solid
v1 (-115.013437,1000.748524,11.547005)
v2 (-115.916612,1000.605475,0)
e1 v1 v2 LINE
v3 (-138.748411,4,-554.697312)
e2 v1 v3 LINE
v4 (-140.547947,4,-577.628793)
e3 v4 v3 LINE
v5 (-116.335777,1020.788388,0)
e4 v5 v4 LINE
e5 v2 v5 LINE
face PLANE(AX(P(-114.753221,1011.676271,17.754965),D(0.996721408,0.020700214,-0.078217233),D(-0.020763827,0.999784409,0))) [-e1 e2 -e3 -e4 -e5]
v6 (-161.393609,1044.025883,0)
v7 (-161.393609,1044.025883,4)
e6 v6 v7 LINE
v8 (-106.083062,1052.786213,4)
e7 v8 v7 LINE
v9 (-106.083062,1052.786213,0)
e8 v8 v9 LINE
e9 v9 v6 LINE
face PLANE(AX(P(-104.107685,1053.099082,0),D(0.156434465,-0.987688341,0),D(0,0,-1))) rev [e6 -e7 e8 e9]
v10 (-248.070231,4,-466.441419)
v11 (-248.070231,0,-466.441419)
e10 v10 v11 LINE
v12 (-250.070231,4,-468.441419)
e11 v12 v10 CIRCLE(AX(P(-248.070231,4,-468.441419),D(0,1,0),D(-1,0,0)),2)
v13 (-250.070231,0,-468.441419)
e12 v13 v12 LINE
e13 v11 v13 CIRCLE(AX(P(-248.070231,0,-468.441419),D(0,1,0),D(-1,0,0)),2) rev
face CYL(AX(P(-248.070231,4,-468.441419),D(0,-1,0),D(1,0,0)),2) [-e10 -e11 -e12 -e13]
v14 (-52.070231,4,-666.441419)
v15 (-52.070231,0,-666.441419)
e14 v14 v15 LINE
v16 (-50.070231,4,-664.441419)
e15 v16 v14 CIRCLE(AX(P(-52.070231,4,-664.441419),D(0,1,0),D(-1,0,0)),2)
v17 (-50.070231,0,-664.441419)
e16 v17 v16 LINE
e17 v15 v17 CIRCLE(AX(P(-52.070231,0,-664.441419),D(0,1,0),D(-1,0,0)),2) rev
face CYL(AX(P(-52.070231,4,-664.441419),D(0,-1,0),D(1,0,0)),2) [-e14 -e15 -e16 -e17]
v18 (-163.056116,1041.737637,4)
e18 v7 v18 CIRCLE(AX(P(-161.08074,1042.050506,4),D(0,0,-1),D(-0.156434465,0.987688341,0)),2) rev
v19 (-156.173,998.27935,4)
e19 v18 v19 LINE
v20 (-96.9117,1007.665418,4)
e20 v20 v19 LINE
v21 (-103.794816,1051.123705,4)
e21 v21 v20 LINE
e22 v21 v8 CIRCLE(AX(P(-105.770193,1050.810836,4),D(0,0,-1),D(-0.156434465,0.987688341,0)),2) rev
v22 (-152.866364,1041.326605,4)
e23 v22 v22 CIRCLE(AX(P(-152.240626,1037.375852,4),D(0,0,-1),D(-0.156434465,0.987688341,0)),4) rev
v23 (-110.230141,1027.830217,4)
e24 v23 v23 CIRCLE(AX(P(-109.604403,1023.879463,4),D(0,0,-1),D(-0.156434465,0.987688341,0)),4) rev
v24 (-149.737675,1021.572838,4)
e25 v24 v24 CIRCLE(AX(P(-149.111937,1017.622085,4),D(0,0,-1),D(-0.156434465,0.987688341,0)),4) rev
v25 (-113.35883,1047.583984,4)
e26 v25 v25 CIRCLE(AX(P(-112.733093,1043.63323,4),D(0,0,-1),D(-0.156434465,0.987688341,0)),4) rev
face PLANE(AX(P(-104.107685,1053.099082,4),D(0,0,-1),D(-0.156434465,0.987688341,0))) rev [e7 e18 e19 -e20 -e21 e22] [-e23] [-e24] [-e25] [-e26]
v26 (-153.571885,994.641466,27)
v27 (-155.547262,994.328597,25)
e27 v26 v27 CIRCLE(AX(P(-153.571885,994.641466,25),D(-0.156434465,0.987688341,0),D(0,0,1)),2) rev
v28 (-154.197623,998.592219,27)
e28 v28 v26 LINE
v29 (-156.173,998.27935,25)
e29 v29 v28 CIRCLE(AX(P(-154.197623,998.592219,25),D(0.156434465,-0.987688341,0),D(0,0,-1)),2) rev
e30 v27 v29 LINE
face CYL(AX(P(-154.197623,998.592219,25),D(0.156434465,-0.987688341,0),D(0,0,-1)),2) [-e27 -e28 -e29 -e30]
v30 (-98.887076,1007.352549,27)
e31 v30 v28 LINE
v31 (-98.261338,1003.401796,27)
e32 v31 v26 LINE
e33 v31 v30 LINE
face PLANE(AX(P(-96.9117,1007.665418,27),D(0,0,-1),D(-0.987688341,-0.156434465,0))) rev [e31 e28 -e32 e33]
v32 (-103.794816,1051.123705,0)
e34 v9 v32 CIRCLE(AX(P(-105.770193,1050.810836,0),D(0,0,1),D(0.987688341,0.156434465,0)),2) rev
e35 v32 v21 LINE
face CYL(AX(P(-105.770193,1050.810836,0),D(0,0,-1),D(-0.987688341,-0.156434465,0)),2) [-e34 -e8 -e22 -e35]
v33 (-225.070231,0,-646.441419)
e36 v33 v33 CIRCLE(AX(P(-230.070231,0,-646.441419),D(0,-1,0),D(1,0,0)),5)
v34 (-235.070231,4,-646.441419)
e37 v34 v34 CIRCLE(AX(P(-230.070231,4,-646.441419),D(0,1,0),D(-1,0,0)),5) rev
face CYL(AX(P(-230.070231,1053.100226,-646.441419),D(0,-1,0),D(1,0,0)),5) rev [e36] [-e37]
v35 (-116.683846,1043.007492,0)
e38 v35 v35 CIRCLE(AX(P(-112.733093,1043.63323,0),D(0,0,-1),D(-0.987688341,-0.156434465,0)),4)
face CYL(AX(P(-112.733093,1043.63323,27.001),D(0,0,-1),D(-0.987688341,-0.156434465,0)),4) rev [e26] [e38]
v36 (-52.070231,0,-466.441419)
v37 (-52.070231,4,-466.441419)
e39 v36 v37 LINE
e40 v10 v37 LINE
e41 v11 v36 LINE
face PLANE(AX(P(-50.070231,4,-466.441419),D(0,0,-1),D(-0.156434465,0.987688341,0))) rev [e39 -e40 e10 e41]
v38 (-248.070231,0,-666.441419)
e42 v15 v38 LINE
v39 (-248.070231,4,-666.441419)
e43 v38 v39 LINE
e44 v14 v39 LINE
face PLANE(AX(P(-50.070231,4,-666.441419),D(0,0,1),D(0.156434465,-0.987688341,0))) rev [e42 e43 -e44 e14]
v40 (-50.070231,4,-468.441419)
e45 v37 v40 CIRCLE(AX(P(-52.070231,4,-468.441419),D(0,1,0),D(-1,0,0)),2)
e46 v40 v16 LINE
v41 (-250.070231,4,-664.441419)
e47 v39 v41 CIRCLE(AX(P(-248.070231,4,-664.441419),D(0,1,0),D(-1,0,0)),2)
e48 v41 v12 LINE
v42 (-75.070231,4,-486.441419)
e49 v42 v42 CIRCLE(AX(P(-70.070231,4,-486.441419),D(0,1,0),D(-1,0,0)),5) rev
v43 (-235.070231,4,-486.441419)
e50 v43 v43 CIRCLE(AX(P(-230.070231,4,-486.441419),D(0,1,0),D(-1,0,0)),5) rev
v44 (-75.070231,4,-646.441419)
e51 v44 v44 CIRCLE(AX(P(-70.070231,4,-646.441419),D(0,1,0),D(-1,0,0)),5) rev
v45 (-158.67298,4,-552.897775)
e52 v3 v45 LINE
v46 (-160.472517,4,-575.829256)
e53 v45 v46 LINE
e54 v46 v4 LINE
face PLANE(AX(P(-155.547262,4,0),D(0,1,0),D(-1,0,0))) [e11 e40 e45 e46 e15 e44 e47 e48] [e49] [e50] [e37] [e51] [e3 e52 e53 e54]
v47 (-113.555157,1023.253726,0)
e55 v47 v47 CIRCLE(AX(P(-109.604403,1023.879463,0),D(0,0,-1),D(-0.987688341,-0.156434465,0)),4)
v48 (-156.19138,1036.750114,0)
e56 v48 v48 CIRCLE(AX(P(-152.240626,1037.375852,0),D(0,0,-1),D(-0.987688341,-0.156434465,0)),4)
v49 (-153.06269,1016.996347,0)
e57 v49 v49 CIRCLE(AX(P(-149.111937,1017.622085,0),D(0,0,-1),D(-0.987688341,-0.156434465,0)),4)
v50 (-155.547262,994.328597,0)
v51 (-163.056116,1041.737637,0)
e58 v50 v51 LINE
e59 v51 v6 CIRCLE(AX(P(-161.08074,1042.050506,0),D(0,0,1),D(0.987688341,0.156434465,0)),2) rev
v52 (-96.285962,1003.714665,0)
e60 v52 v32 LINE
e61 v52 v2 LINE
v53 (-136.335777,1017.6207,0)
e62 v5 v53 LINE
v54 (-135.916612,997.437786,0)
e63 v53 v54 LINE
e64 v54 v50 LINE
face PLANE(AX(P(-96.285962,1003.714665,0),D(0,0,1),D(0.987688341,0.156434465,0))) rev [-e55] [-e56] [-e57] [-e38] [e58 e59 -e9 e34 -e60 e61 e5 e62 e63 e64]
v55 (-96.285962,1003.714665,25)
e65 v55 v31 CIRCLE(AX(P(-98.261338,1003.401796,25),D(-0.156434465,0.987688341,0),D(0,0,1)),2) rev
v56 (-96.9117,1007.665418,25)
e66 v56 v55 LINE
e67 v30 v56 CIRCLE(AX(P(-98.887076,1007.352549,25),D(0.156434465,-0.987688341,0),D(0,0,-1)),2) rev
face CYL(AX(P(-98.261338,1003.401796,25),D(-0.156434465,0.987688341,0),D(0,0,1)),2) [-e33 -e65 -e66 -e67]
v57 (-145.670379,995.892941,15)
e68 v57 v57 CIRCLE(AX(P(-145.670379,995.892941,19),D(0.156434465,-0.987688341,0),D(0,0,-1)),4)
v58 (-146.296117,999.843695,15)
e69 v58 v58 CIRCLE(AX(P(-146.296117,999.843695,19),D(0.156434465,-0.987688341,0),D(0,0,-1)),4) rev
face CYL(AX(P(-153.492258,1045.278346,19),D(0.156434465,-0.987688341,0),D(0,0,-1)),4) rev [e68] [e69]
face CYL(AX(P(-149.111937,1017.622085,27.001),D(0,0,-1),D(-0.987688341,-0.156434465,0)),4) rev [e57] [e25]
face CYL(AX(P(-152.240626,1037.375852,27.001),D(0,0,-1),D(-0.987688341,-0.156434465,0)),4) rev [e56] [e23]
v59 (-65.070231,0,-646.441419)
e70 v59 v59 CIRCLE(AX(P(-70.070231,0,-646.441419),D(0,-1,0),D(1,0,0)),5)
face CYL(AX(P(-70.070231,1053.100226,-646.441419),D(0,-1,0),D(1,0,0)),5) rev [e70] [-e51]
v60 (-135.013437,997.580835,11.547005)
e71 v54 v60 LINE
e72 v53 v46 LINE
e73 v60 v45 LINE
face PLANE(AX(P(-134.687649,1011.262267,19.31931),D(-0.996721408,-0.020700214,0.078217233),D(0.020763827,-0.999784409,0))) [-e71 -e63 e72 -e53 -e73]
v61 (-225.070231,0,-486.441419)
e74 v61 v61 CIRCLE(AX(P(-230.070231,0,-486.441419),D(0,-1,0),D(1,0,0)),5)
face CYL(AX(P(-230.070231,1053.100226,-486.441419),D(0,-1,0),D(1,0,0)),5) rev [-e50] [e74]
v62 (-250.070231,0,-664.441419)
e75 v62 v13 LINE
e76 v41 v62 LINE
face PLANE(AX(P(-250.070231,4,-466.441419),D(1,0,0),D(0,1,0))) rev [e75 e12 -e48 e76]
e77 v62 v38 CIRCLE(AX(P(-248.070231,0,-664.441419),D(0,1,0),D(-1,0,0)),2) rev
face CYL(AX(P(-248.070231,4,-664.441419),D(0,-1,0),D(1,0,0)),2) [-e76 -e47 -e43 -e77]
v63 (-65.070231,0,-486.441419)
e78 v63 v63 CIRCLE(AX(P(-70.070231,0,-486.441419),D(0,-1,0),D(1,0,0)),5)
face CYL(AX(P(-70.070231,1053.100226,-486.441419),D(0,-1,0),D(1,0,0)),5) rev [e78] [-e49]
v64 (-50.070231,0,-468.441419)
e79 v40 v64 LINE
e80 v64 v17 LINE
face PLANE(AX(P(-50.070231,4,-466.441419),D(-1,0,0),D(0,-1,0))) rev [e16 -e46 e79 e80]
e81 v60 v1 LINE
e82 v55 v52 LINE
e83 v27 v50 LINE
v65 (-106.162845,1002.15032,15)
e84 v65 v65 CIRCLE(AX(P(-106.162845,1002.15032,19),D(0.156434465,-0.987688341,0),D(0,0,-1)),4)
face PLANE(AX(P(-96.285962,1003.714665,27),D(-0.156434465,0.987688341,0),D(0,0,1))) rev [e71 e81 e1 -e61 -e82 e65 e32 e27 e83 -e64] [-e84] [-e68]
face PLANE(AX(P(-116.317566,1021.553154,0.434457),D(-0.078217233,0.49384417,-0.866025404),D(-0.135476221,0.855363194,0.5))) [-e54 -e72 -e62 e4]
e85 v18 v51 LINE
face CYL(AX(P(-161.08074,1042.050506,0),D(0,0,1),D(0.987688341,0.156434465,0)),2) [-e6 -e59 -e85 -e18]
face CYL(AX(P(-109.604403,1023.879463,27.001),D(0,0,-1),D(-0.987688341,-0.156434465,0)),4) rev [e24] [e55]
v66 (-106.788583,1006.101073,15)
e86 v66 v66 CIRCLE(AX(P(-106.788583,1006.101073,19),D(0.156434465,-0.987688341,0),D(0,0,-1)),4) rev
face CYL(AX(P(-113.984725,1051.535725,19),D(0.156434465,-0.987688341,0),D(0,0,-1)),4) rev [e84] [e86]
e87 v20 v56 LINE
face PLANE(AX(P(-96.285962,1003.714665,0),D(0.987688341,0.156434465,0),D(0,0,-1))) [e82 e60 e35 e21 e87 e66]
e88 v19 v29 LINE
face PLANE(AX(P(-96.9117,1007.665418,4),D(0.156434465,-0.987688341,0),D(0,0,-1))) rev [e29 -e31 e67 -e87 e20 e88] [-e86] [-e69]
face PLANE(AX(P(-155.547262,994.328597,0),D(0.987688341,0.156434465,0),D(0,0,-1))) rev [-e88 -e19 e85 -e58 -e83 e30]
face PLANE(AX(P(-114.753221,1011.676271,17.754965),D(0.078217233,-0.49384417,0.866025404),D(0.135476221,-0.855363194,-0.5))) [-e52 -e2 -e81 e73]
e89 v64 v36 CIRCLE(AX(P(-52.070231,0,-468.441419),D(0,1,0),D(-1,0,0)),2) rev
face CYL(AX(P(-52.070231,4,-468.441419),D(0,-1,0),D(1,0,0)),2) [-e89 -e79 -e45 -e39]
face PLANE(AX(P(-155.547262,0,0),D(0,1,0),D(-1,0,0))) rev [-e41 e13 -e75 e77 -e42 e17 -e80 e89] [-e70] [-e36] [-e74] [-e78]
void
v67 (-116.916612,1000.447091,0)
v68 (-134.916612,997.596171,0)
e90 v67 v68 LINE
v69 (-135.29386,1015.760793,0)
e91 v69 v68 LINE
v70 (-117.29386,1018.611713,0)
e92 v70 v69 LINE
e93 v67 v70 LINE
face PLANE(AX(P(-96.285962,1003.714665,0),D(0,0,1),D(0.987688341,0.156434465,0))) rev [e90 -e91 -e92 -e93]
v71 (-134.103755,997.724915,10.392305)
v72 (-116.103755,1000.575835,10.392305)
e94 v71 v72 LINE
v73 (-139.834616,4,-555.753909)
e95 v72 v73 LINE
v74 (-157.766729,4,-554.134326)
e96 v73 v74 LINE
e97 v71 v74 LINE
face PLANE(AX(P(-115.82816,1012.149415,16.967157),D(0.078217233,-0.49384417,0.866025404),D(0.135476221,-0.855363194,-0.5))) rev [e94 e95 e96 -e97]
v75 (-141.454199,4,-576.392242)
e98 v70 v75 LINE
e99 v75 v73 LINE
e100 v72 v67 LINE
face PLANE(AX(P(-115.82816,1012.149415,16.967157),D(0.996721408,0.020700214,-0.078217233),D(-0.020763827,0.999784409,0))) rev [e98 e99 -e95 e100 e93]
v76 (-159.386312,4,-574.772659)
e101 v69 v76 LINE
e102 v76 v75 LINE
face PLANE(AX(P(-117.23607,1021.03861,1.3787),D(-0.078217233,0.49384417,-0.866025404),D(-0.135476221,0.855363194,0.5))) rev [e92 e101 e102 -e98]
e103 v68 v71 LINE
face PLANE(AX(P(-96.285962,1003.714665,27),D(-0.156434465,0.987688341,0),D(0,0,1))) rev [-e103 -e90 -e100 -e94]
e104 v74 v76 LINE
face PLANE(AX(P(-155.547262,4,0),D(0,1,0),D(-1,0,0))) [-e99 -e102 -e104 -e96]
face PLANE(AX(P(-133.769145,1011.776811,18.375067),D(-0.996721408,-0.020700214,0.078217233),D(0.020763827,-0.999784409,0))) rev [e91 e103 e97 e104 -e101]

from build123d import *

# Parameters (mm, degrees)
BOSS_EXTRUDE1_DEPTH      = 60
BOSS_EXTRUDE2_DEPTH      = 2000
BOSS_EXTRUDE2_DEPTH_BACK = 20
SKETCH3_W                = 20
SKETCH3_H                = 20
SKETCH3_W_2              = 18
SKETCH3_H_2              = 18
CUT_EXTRUDE1_DEPTH       = 60
SKETCH7_W                = 200
SKETCH7_H                = 200
BOSS_EXTRUDE3_DEPTH      = 4
SKETCH8_W                = 109.20231627
SKETCH8_H                = 482.966945154
CUT_EXTRUDE3_DEPTH       = 1000
CUT_EXTRUDE4_REACH       = 1228.081
SKETCH9_R                = 3.999999996
CUT_EXTRUDE5_REACH       = 1228.081
SKETCH10_R               = 4.000000003
CUT_EXTRUDE6_REACH       = 1249.32
SKETCH11_R               = 5
FILLET1_R                = 2
FILLET2_R                = 2
BODY_MOVE_COPY1_ANGLE    = 9


with BuildPart() as part:
    # Sketch1 → Boss-Extrude1 (new body)
    with BuildSketch(Plane(origin=(0, 0, 0), x_dir=(0, 0, -1), z_dir=(1, 0, 0))):
        Polygon((0, 0), (0, 50), (-4, 50), (-4, 4), (-27, 4), (-27, 0), align=None)
    extrude(amount=BOSS_EXTRUDE1_DEPTH)

    # Sketch3 → Boss-Extrude2 (add, two sides: drawn at the far end of the back side and taken through both)
    with BuildSketch(Plane(origin=(0.734152256, 4.01424851, 2.317627458), x_dir=(0, -0.49999999999998884, 0.866025403784445), z_dir=(-0.1564344650402179, -0.8553631939770945, -0.4938441702975589)).offset(-BOSS_EXTRUDE2_DEPTH_BACK)):
        with Locations((0, -29.630650218)):
            Rectangle(SKETCH3_W, SKETCH3_H)
        with Locations((0, -29.630650218)):
            Rectangle(SKETCH3_W_2, SKETCH3_H_2, mode=Mode.SUBTRACT)
    extrude(amount=BOSS_EXTRUDE2_DEPTH + BOSS_EXTRUDE2_DEPTH_BACK)

    # Sketch5 → Cut-Extrude1 (cut)
    with BuildSketch(Plane.ZY):
        Polygon((4, 4), (4, 36.054903459), (38.781358344, 4), align=None)
    extrude(amount=-CUT_EXTRUDE1_DEPTH, mode=Mode.SUBTRACT)

    # Sketch7 → Boss-Extrude3 (add)
    with BuildSketch(Plane(origin=(-155.547262091, -982.086761679, 2e-09), x_dir=(0.9876883405962854, -0.15643446503298483, 2.850074130140158e-13), z_dir=(0.15643446503298483, 0.9876883405962854, -1.7994659856963007e-12))):
        with Locations((5.477031178, 566.441418592)):
            Rectangle(SKETCH7_W, SKETCH7_H)
    extrude(amount=BOSS_EXTRUDE3_DEPTH)

    # Sketch8 → Cut-Extrude3 (cut)
    with BuildSketch(Plane(origin=(-155.547262091, -982.086761679, 2e-09), x_dir=(0.9876883405962856, -0.15643446503298414, -2.6345368338963644e-10), z_dir=(-0.15643446503298414, -0.9876883405962856, 1.799719805411024e-12))):
        with Locations((4.33544583, -787.065663544)):
            Rectangle(SKETCH8_W, SKETCH8_H)
    extrude(amount=CUT_EXTRUDE3_DEPTH, mode=Mode.SUBTRACT)

    # Sketch9 → Cut-Extrude4 (cut, up to next)
    with BuildSketch(Plane(origin=(0, 0, 0), x_dir=(-1, 0, 0), z_dir=(0, 0, -1)), mode=Mode.PRIVATE) as cut_extrude4_sk1:
        with Locations((-50, 22)):
            Circle(SKETCH9_R)
    cut_extrude4_tool1 = extrude(cut_extrude4_sk1.sketch, amount=-CUT_EXTRUDE4_REACH, mode=Mode.PRIVATE) & part.part
    # Sketch9 → Cut-Extrude4 (cut, up to next)
    with BuildSketch(Plane(origin=(0, 0, 0), x_dir=(-1, 0, 0), z_dir=(0, 0, -1)), mode=Mode.PRIVATE) as cut_extrude4_sk2:
        with Locations((-10, 22)):
            Circle(SKETCH9_R)
    cut_extrude4_tool2 = extrude(cut_extrude4_sk2.sketch, amount=-CUT_EXTRUDE4_REACH, mode=Mode.PRIVATE) & part.part
    # Sketch9 → Cut-Extrude4 (cut, up to next)
    with BuildSketch(Plane(origin=(0, 0, 0), x_dir=(-1, 0, 0), z_dir=(0, 0, -1)), mode=Mode.PRIVATE) as cut_extrude4_sk3:
        with Locations((-10, 42)):
            Circle(SKETCH9_R)
    cut_extrude4_tool3 = extrude(cut_extrude4_sk3.sketch, amount=-CUT_EXTRUDE4_REACH, mode=Mode.PRIVATE) & part.part
    # Sketch9 → Cut-Extrude4 (cut, up to next)
    with BuildSketch(Plane(origin=(0, 0, 0), x_dir=(-1, 0, 0), z_dir=(0, 0, -1)), mode=Mode.PRIVATE) as cut_extrude4_sk4:
        with Locations((-50, 42)):
            Circle(SKETCH9_R)
    cut_extrude4_tool4 = extrude(cut_extrude4_sk4.sketch, amount=-CUT_EXTRUDE4_REACH, mode=Mode.PRIVATE) & part.part
    add(cut_extrude4_tool1.solids().sort_by_distance((50, 22, 0))[0], mode=Mode.SUBTRACT)
    add(cut_extrude4_tool2.solids().sort_by_distance((10, 22, 0))[0], mode=Mode.SUBTRACT)
    add(cut_extrude4_tool3.solids().sort_by_distance((10, 42, 0))[0], mode=Mode.SUBTRACT)
    add(cut_extrude4_tool4.solids().sort_by_distance((50, 42, 0))[0], mode=Mode.SUBTRACT)

    # Sketch10 → Cut-Extrude5 (cut, up to next)
    with BuildSketch(Plane.XZ, mode=Mode.PRIVATE) as cut_extrude5_sk1:
        with Locations(Location((50, 19, 0), (0, 0, 270))):
            Circle(SKETCH10_R)
    cut_extrude5_tool1 = extrude(cut_extrude5_sk1.sketch, amount=-CUT_EXTRUDE5_REACH, mode=Mode.PRIVATE) & part.part
    # Sketch10 → Cut-Extrude5 (cut, up to next)
    with BuildSketch(Plane.XZ, mode=Mode.PRIVATE) as cut_extrude5_sk2:
        with Locations(Location((10, 19, 0), (0, 0, 270))):
            Circle(SKETCH10_R)
    cut_extrude5_tool2 = extrude(cut_extrude5_sk2.sketch, amount=-CUT_EXTRUDE5_REACH, mode=Mode.PRIVATE) & part.part
    add(cut_extrude5_tool1.solids().sort_by_distance((50, 0, 19))[0], mode=Mode.SUBTRACT)
    add(cut_extrude5_tool2.solids().sort_by_distance((10, 0, 19))[0], mode=Mode.SUBTRACT)

    # Sketch11 → Cut-Extrude6 (cut, up to next)
    with BuildSketch(Plane(origin=(-155.547262091, -982.086761679, 2e-09), x_dir=(0.9876883405962856, -0.15643446503298414, -2.6345368338963665e-10), z_dir=(-0.15643446503298414, -0.9876883405962856, 1.7997198054110692e-12)), mode=Mode.PRIVATE) as cut_extrude6_sk1:
        with Locations((-74.522968646, -486.441418617)):
            Circle(SKETCH11_R)
    cut_extrude6_tool1 = extrude(cut_extrude6_sk1.sketch, amount=-CUT_EXTRUDE6_REACH, mode=Mode.PRIVATE) & part.part
    # Sketch11 → Cut-Extrude6 (cut, up to next)
    with BuildSketch(Plane(origin=(-155.547262091, -982.086761679, 2e-09), x_dir=(0.9876883405962856, -0.15643446503298414, -2.6345368338963665e-10), z_dir=(-0.15643446503298414, -0.9876883405962856, 1.7997198054110692e-12)), mode=Mode.PRIVATE) as cut_extrude6_sk2:
        with Locations((85.477031354, -486.441418617)):
            Circle(SKETCH11_R)
    cut_extrude6_tool2 = extrude(cut_extrude6_sk2.sketch, amount=-CUT_EXTRUDE6_REACH, mode=Mode.PRIVATE) & part.part
    # Sketch11 → Cut-Extrude6 (cut, up to next)
    with BuildSketch(Plane(origin=(-155.547262091, -982.086761679, 2e-09), x_dir=(0.9876883405962856, -0.15643446503298414, -2.6345368338963665e-10), z_dir=(-0.15643446503298414, -0.9876883405962856, 1.7997198054110692e-12)), mode=Mode.PRIVATE) as cut_extrude6_sk3:
        with Locations((85.477031354, -646.441418617)):
            Circle(SKETCH11_R)
    cut_extrude6_tool3 = extrude(cut_extrude6_sk3.sketch, amount=-CUT_EXTRUDE6_REACH, mode=Mode.PRIVATE) & part.part
    # Sketch11 → Cut-Extrude6 (cut, up to next)
    with BuildSketch(Plane(origin=(-155.547262091, -982.086761679, 2e-09), x_dir=(0.9876883405962856, -0.15643446503298414, -2.6345368338963665e-10), z_dir=(-0.15643446503298414, -0.9876883405962856, 1.7997198054110692e-12)), mode=Mode.PRIVATE) as cut_extrude6_sk4:
        with Locations((-74.522968646, -646.441418617)):
            Circle(SKETCH11_R)
    cut_extrude6_tool4 = extrude(cut_extrude6_sk4.sketch, amount=-CUT_EXTRUDE6_REACH, mode=Mode.PRIVATE) & part.part
    add(cut_extrude6_tool1.solids().sort_by_distance((-229.152729, -970.428801, -486.441419))[0], mode=Mode.SUBTRACT)
    add(cut_extrude6_tool2.solids().sort_by_distance((-71.122595, -995.458315, -486.441419))[0], mode=Mode.SUBTRACT)
    add(cut_extrude6_tool3.solids().sort_by_distance((-71.122595, -995.458315, -646.441419))[0], mode=Mode.SUBTRACT)
    add(cut_extrude6_tool4.solids().sort_by_distance((-229.152729, -970.428801, -646.441419))[0], mode=Mode.SUBTRACT)

    # Fillet1
    fillet1_edges = [part.edges().sort_by_distance(p)[0] for p in [
        (60, 50, 2),
        (60, 2, 27),
        (0, 2, 27),
        (0, 50, 2),
    ]]
    fillet(fillet1_edges, radius=FILLET1_R)

    # Fillet2
    fillet2_edges = [part.edges().sort_by_distance(p)[0] for p in [
        (-248.593627385, -965.324734939, -666.44141859),
        (-248.593627385, -965.324734938, -466.44141859),
        (-51.055959266, -996.611627945, -466.44141859),
        (-51.055959266, -996.611627945, -666.44141859),
    ]]
    fillet(fillet2_edges, radius=FILLET2_R)


with BuildPart() as part_1:
    # Body-Move/Copy1: read off the stored shape, not the designer's step
    # Body-Move/Copy1: moved
    add(part.part.moved(Location((1.9150449, 1006.4197144, 0))).rotate(Axis((0, 0, 0), (0, 0, 1)), BODY_MOVE_COPY1_ANGLE))


solid = part_1.part
